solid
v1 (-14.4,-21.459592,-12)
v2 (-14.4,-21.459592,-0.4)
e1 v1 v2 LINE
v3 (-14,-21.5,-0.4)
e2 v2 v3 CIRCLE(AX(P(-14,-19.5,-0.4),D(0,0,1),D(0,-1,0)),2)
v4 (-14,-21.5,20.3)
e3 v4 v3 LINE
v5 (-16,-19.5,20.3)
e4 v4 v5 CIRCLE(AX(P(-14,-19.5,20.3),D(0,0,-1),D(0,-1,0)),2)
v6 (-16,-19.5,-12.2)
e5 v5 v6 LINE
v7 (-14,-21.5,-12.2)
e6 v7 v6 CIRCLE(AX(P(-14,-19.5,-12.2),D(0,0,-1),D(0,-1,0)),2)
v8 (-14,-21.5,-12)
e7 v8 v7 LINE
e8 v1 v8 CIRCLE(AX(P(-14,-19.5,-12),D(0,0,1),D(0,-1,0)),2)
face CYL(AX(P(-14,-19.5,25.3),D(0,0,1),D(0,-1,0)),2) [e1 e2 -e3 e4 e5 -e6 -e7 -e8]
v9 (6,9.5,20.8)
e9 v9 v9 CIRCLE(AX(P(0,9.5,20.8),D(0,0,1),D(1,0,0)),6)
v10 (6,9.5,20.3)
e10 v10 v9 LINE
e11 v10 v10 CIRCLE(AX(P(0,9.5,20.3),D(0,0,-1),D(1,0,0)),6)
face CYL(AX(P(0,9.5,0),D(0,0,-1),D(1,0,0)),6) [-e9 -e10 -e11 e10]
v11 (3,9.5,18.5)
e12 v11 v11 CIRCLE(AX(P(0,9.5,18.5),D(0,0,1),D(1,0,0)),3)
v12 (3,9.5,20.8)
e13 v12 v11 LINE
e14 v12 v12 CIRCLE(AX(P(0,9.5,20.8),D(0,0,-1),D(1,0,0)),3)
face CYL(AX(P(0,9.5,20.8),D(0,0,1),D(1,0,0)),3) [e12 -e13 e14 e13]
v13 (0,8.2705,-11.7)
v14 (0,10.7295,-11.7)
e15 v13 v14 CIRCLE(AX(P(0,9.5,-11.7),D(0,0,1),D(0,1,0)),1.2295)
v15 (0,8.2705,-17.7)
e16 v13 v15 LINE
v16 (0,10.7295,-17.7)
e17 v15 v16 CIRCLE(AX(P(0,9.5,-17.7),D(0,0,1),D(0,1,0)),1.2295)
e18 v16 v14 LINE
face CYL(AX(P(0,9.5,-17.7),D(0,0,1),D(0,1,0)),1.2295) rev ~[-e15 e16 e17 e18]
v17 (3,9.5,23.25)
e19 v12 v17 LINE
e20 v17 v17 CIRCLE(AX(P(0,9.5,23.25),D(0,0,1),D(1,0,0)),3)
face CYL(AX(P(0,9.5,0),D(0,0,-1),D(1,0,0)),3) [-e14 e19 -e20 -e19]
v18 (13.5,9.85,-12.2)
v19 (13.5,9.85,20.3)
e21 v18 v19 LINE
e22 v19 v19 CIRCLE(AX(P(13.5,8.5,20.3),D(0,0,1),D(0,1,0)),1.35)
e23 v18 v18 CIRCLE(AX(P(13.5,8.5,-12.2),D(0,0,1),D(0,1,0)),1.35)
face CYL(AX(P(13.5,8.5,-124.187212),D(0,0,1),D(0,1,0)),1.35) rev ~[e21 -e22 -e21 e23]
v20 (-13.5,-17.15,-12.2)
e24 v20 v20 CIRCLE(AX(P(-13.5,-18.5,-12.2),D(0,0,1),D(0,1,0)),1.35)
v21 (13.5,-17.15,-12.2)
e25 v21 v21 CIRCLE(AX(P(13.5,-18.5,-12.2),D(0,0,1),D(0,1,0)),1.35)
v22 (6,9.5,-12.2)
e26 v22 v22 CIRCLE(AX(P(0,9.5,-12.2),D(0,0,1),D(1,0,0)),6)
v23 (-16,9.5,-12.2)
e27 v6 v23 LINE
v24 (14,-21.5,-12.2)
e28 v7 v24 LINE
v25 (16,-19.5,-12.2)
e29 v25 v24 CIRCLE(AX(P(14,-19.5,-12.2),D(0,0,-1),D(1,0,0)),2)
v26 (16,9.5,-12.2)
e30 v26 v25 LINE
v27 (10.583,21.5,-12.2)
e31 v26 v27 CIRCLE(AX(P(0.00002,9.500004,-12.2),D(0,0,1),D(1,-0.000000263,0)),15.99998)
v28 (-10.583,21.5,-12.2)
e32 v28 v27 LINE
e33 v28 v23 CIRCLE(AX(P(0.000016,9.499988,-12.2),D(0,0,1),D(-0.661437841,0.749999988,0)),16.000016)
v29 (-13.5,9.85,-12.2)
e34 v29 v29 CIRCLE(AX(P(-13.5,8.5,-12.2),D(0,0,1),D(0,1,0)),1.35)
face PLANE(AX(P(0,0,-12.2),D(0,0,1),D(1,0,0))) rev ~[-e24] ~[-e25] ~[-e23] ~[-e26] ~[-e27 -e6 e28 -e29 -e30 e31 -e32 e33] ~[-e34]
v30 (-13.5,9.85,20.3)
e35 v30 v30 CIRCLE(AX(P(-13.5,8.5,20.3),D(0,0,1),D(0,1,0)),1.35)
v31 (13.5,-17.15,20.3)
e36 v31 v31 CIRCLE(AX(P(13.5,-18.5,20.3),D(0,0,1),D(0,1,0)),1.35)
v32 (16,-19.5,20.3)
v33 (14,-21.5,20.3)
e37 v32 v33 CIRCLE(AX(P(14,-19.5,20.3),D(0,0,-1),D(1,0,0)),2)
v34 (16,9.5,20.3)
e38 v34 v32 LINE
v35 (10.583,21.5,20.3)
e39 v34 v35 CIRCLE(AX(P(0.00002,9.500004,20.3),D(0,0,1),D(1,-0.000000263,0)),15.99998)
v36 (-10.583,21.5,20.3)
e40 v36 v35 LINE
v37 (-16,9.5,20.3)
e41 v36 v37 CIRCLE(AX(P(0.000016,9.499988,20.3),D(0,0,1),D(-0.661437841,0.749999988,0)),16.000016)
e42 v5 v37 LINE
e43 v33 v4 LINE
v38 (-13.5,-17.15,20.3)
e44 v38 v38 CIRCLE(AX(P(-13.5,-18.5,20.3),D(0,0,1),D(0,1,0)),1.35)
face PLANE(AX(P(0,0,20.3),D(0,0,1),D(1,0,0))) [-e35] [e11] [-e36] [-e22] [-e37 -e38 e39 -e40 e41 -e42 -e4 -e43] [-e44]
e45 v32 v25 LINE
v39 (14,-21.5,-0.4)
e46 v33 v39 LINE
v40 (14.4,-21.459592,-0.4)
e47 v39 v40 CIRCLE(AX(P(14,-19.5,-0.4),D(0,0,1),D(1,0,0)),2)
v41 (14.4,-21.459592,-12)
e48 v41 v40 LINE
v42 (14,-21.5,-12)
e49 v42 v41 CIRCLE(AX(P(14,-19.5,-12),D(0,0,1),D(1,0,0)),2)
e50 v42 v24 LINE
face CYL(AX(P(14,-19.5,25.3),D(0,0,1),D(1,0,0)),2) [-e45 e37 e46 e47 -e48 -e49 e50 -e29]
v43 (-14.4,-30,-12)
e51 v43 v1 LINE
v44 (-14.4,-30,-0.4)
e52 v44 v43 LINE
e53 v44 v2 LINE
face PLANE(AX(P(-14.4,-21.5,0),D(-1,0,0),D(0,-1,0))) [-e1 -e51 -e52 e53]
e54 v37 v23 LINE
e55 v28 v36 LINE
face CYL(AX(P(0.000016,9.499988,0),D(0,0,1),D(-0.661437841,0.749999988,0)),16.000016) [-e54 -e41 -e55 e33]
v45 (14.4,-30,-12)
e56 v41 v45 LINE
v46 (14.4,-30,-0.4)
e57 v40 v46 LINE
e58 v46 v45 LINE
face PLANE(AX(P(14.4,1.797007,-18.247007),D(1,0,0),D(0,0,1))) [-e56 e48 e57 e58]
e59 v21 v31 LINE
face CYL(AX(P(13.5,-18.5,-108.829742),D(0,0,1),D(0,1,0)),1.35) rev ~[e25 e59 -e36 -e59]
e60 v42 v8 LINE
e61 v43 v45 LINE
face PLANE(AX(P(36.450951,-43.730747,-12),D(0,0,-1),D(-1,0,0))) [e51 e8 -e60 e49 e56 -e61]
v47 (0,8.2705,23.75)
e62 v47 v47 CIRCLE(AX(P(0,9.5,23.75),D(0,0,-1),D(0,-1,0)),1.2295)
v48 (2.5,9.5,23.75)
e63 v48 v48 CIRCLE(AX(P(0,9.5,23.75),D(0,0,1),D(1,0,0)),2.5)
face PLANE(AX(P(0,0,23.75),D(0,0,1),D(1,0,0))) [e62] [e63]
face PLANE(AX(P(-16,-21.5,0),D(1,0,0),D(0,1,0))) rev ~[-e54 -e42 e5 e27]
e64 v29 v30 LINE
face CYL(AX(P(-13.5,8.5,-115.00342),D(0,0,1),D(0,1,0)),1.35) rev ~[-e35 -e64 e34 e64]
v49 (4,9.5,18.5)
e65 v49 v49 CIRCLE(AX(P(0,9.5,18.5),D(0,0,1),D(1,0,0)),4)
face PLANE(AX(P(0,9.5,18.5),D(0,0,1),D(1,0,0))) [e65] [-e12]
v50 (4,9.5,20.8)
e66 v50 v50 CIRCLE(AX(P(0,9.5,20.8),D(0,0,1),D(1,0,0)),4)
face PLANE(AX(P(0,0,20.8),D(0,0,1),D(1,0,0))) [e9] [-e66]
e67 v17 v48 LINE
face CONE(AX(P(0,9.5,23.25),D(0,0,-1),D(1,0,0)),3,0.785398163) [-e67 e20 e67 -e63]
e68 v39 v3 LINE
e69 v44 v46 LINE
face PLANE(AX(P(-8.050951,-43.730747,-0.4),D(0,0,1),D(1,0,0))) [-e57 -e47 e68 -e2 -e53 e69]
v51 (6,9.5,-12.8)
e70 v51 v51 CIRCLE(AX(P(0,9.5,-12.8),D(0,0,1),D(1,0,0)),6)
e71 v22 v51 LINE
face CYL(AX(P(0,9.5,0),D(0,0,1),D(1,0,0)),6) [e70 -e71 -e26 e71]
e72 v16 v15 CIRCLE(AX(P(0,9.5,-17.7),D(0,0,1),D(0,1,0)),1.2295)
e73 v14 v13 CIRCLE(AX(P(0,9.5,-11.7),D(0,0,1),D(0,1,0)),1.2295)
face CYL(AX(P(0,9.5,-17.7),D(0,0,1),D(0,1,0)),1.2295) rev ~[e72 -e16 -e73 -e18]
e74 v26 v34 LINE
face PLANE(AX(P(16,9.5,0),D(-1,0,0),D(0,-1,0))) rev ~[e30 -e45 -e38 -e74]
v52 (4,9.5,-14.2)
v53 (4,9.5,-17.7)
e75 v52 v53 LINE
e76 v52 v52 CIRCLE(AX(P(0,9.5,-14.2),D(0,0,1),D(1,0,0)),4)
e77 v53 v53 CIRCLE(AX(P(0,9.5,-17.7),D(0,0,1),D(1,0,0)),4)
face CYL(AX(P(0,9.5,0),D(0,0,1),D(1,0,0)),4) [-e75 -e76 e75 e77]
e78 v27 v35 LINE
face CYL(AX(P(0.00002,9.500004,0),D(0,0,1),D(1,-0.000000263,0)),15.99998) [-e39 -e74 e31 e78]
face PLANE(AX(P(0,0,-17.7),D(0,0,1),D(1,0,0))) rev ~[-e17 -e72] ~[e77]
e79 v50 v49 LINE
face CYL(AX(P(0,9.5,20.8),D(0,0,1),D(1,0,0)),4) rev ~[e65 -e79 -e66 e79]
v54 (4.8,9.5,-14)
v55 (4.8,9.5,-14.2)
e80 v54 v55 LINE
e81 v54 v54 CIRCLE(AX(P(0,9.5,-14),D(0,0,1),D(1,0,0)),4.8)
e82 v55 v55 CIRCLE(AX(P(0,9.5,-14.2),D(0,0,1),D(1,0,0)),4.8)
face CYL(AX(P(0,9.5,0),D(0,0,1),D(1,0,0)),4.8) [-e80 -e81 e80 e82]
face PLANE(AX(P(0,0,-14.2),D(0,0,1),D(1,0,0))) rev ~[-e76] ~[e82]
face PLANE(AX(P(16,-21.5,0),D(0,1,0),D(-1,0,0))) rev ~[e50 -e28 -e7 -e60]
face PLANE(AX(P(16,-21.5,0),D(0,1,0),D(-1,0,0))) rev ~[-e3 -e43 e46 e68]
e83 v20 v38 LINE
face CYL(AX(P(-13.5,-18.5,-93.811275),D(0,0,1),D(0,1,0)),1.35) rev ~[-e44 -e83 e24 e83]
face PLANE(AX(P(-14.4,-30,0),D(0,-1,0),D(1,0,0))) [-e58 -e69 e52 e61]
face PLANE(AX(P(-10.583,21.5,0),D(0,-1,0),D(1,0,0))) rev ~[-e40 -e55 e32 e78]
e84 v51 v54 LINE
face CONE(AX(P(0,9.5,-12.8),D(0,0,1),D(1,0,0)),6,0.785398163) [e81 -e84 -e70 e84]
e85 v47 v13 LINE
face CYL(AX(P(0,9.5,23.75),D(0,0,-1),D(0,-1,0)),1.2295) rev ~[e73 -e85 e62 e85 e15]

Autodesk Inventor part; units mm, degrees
ref_plane "YZ Plane" through (0, 0, 0) normal (1, 0, 0) x (0, 1, 0)
ref_plane "XZ Plane" through (0, 0, 0) normal (0, 1, 0) x (-1, 0, 0)
ref_plane "XY Plane" through (0, 0, 0) normal (0, 0, 1) x (1, 0, 0)
sketch "スケッチ1" plane through (0, 0, 0) normal (0, 0, 1) x (1, 0, 0)
  line L0 (-16, 21.5) -> (-10.583, 21.5) construction
  line L1 (16, 21.5) -> (16, 9.5) construction
  line L2 (16, -21.5) -> (-16, -21.5)
  line L3 (-16, -21.5) -> (-16, 9.5)
  line L4 (-16, 21.5) -> (16, -21.5) construction
  line L5 (16, 21.5) -> (-16, -21.5) construction
  line L6 (-14.4, -21.5) -> (-14.4, -30)
  line L7 (-14.4, -30) -> (14.4, -30)
  line L8 (0, 21.5) -> (0, -21.5) construction
  line L9 (14.4, -21.5) -> (14.4, -30)
  line L10 (-13.5, 21.5) -> (-13.5, -21.5) construction
  circle A0 centre (0, 9.5) radius 6
  circle A1 centre (0, 9.5) radius 4
  arc A2 (-10.583, 21.5) -> (-16, 9.5) centre (0, 9.5) ccw
  arc A3 (16, 9.5) -> (10.583, 21.5) centre (0, 9.5) ccw
  line L11 (-10.583, 21.5) -> (10.583, 21.5)
  line L12 (-16, 9.5) -> (-16, 21.5) construction
  line L13 (10.583, 21.5) -> (16, 21.5) construction
  line L14 (16, 9.5) -> (16, -21.5)
  circle A4 centre (0, 9.5) radius 3
  circle A5 centre (0, 9.5) radius 4.8
  point P0 (0, 0)
  point P1 (-13.5, 8.5)
  point P2 (-13.5, -18.5)
  point P3 (13.5, 8.5)
  point P4 (13.5, -18.5)
  dimension "d0" = 32
  dimension "d1" = 43
  dimension "d4" = 28.8
  dimension "d5" = 8.5
  dimension "d8" = 27
  dimension "d9" = 8.5
  dimension "d12" = 18.5
  dimension "d13" = 12
  dimension "d14" = 8
  dimension "d15" = 9.5
  dimension "d17" = 16
  dimension "d32" = 13.5
  dimension "d47" = 6
  dimension "d67" = 9.6
extrude "押し出し1" add sketch "スケッチ1" against normal blind 12.2 contours L2 L3 A2 L11 A3 L14 | A0 | A1 | A4 | A5
extrude "押し出し2" add sketch "スケッチ1" against normal blind 12 contours L9 L7 L6 L2
extrude "押し出し3" add sketch "スケッチ1" against normal blind 14 contours A0 | A1 | A4 | A5
extrude "押し出し4" add sketch "スケッチ1" against normal blind 17.7 contours A1 | A4
chamfer "面取り1" distance 1.2 angle 45 1 edges at (-6, 9.5, -14)
sketch "スケッチ2" plane through (0, 9.5, -17.7) normal (0, 0, -1) x (-1, 0, 0)
  circle A0 centre (0, 0) radius 4 projected
  point P0 (0, -9.5)
hole "穴1" at (0, 9.5, -17.7) direction (0, 0, 1) diameter 2.459 depth 6 thread size "M3x0.5" class "6H" standard "ANSI Metric M Profile"
extrude "押し出し5" add sketch "スケッチ1" along normal blind 20.3 contours L2 L3 A2 L11 A3 L14 | A0 | A1 | A4 | A5
hole "穴2" at (-13.5, 8.5, 0) at (-13.5, -18.5, 0) at (13.5, 8.5, 0) at (13.5, -18.5, 0) direction (0, 0, 1) diameter 2.7 end through all both
extrude "押し出し6" cut sketch "スケッチ1" against normal blind 0.4 contours L9 L7 L6 L2
fillet "フィレット1" radius 2 2 edges at (16, -21.5, 4.05) (-16, -21.5, 4.05)
extrude "押し出し7" add sketch "スケッチ1" along normal blind 20.8 contours A0 | A1 | A4 | A5
extrude "押し出し8" add sketch "スケッチ1" along normal blind 23.75 contours A4
sketch "スケッチ3" plane through (0, 9.5, 23.75) normal (0, 0, 1) x (1, 0, 0)
  circle A0 centre (0, 0) radius 1.2295 projected
  point P0 (0, -9.5)
hole "穴3" at (0, 9.5, 23.75) direction (0, 0, -1) diameter 2.459 end through all thread size "M3x0.5" class "6H" standard "ANSI Metric M Profile"
sketch "スケッチ4" plane through (0, 9.5, 20.8) normal (0, 0, 1) x (1, 0, 0)
  circle A0 centre (0, 0) radius 4
  circle A1 centre (0, 0) radius 3
  point P0 (0, -9.5)
extrude "押し出し9" cut sketch "スケッチ4" against normal blind 2.3
chamfer "面取り2" distance 0.5 angle 45 1 edges at (-3, 9.5, 23.75)
extrude "押し出し10" add sketch "スケッチ1" against normal blind 14.2 contours A5
properties part number "B3M-SC-1040-A"
